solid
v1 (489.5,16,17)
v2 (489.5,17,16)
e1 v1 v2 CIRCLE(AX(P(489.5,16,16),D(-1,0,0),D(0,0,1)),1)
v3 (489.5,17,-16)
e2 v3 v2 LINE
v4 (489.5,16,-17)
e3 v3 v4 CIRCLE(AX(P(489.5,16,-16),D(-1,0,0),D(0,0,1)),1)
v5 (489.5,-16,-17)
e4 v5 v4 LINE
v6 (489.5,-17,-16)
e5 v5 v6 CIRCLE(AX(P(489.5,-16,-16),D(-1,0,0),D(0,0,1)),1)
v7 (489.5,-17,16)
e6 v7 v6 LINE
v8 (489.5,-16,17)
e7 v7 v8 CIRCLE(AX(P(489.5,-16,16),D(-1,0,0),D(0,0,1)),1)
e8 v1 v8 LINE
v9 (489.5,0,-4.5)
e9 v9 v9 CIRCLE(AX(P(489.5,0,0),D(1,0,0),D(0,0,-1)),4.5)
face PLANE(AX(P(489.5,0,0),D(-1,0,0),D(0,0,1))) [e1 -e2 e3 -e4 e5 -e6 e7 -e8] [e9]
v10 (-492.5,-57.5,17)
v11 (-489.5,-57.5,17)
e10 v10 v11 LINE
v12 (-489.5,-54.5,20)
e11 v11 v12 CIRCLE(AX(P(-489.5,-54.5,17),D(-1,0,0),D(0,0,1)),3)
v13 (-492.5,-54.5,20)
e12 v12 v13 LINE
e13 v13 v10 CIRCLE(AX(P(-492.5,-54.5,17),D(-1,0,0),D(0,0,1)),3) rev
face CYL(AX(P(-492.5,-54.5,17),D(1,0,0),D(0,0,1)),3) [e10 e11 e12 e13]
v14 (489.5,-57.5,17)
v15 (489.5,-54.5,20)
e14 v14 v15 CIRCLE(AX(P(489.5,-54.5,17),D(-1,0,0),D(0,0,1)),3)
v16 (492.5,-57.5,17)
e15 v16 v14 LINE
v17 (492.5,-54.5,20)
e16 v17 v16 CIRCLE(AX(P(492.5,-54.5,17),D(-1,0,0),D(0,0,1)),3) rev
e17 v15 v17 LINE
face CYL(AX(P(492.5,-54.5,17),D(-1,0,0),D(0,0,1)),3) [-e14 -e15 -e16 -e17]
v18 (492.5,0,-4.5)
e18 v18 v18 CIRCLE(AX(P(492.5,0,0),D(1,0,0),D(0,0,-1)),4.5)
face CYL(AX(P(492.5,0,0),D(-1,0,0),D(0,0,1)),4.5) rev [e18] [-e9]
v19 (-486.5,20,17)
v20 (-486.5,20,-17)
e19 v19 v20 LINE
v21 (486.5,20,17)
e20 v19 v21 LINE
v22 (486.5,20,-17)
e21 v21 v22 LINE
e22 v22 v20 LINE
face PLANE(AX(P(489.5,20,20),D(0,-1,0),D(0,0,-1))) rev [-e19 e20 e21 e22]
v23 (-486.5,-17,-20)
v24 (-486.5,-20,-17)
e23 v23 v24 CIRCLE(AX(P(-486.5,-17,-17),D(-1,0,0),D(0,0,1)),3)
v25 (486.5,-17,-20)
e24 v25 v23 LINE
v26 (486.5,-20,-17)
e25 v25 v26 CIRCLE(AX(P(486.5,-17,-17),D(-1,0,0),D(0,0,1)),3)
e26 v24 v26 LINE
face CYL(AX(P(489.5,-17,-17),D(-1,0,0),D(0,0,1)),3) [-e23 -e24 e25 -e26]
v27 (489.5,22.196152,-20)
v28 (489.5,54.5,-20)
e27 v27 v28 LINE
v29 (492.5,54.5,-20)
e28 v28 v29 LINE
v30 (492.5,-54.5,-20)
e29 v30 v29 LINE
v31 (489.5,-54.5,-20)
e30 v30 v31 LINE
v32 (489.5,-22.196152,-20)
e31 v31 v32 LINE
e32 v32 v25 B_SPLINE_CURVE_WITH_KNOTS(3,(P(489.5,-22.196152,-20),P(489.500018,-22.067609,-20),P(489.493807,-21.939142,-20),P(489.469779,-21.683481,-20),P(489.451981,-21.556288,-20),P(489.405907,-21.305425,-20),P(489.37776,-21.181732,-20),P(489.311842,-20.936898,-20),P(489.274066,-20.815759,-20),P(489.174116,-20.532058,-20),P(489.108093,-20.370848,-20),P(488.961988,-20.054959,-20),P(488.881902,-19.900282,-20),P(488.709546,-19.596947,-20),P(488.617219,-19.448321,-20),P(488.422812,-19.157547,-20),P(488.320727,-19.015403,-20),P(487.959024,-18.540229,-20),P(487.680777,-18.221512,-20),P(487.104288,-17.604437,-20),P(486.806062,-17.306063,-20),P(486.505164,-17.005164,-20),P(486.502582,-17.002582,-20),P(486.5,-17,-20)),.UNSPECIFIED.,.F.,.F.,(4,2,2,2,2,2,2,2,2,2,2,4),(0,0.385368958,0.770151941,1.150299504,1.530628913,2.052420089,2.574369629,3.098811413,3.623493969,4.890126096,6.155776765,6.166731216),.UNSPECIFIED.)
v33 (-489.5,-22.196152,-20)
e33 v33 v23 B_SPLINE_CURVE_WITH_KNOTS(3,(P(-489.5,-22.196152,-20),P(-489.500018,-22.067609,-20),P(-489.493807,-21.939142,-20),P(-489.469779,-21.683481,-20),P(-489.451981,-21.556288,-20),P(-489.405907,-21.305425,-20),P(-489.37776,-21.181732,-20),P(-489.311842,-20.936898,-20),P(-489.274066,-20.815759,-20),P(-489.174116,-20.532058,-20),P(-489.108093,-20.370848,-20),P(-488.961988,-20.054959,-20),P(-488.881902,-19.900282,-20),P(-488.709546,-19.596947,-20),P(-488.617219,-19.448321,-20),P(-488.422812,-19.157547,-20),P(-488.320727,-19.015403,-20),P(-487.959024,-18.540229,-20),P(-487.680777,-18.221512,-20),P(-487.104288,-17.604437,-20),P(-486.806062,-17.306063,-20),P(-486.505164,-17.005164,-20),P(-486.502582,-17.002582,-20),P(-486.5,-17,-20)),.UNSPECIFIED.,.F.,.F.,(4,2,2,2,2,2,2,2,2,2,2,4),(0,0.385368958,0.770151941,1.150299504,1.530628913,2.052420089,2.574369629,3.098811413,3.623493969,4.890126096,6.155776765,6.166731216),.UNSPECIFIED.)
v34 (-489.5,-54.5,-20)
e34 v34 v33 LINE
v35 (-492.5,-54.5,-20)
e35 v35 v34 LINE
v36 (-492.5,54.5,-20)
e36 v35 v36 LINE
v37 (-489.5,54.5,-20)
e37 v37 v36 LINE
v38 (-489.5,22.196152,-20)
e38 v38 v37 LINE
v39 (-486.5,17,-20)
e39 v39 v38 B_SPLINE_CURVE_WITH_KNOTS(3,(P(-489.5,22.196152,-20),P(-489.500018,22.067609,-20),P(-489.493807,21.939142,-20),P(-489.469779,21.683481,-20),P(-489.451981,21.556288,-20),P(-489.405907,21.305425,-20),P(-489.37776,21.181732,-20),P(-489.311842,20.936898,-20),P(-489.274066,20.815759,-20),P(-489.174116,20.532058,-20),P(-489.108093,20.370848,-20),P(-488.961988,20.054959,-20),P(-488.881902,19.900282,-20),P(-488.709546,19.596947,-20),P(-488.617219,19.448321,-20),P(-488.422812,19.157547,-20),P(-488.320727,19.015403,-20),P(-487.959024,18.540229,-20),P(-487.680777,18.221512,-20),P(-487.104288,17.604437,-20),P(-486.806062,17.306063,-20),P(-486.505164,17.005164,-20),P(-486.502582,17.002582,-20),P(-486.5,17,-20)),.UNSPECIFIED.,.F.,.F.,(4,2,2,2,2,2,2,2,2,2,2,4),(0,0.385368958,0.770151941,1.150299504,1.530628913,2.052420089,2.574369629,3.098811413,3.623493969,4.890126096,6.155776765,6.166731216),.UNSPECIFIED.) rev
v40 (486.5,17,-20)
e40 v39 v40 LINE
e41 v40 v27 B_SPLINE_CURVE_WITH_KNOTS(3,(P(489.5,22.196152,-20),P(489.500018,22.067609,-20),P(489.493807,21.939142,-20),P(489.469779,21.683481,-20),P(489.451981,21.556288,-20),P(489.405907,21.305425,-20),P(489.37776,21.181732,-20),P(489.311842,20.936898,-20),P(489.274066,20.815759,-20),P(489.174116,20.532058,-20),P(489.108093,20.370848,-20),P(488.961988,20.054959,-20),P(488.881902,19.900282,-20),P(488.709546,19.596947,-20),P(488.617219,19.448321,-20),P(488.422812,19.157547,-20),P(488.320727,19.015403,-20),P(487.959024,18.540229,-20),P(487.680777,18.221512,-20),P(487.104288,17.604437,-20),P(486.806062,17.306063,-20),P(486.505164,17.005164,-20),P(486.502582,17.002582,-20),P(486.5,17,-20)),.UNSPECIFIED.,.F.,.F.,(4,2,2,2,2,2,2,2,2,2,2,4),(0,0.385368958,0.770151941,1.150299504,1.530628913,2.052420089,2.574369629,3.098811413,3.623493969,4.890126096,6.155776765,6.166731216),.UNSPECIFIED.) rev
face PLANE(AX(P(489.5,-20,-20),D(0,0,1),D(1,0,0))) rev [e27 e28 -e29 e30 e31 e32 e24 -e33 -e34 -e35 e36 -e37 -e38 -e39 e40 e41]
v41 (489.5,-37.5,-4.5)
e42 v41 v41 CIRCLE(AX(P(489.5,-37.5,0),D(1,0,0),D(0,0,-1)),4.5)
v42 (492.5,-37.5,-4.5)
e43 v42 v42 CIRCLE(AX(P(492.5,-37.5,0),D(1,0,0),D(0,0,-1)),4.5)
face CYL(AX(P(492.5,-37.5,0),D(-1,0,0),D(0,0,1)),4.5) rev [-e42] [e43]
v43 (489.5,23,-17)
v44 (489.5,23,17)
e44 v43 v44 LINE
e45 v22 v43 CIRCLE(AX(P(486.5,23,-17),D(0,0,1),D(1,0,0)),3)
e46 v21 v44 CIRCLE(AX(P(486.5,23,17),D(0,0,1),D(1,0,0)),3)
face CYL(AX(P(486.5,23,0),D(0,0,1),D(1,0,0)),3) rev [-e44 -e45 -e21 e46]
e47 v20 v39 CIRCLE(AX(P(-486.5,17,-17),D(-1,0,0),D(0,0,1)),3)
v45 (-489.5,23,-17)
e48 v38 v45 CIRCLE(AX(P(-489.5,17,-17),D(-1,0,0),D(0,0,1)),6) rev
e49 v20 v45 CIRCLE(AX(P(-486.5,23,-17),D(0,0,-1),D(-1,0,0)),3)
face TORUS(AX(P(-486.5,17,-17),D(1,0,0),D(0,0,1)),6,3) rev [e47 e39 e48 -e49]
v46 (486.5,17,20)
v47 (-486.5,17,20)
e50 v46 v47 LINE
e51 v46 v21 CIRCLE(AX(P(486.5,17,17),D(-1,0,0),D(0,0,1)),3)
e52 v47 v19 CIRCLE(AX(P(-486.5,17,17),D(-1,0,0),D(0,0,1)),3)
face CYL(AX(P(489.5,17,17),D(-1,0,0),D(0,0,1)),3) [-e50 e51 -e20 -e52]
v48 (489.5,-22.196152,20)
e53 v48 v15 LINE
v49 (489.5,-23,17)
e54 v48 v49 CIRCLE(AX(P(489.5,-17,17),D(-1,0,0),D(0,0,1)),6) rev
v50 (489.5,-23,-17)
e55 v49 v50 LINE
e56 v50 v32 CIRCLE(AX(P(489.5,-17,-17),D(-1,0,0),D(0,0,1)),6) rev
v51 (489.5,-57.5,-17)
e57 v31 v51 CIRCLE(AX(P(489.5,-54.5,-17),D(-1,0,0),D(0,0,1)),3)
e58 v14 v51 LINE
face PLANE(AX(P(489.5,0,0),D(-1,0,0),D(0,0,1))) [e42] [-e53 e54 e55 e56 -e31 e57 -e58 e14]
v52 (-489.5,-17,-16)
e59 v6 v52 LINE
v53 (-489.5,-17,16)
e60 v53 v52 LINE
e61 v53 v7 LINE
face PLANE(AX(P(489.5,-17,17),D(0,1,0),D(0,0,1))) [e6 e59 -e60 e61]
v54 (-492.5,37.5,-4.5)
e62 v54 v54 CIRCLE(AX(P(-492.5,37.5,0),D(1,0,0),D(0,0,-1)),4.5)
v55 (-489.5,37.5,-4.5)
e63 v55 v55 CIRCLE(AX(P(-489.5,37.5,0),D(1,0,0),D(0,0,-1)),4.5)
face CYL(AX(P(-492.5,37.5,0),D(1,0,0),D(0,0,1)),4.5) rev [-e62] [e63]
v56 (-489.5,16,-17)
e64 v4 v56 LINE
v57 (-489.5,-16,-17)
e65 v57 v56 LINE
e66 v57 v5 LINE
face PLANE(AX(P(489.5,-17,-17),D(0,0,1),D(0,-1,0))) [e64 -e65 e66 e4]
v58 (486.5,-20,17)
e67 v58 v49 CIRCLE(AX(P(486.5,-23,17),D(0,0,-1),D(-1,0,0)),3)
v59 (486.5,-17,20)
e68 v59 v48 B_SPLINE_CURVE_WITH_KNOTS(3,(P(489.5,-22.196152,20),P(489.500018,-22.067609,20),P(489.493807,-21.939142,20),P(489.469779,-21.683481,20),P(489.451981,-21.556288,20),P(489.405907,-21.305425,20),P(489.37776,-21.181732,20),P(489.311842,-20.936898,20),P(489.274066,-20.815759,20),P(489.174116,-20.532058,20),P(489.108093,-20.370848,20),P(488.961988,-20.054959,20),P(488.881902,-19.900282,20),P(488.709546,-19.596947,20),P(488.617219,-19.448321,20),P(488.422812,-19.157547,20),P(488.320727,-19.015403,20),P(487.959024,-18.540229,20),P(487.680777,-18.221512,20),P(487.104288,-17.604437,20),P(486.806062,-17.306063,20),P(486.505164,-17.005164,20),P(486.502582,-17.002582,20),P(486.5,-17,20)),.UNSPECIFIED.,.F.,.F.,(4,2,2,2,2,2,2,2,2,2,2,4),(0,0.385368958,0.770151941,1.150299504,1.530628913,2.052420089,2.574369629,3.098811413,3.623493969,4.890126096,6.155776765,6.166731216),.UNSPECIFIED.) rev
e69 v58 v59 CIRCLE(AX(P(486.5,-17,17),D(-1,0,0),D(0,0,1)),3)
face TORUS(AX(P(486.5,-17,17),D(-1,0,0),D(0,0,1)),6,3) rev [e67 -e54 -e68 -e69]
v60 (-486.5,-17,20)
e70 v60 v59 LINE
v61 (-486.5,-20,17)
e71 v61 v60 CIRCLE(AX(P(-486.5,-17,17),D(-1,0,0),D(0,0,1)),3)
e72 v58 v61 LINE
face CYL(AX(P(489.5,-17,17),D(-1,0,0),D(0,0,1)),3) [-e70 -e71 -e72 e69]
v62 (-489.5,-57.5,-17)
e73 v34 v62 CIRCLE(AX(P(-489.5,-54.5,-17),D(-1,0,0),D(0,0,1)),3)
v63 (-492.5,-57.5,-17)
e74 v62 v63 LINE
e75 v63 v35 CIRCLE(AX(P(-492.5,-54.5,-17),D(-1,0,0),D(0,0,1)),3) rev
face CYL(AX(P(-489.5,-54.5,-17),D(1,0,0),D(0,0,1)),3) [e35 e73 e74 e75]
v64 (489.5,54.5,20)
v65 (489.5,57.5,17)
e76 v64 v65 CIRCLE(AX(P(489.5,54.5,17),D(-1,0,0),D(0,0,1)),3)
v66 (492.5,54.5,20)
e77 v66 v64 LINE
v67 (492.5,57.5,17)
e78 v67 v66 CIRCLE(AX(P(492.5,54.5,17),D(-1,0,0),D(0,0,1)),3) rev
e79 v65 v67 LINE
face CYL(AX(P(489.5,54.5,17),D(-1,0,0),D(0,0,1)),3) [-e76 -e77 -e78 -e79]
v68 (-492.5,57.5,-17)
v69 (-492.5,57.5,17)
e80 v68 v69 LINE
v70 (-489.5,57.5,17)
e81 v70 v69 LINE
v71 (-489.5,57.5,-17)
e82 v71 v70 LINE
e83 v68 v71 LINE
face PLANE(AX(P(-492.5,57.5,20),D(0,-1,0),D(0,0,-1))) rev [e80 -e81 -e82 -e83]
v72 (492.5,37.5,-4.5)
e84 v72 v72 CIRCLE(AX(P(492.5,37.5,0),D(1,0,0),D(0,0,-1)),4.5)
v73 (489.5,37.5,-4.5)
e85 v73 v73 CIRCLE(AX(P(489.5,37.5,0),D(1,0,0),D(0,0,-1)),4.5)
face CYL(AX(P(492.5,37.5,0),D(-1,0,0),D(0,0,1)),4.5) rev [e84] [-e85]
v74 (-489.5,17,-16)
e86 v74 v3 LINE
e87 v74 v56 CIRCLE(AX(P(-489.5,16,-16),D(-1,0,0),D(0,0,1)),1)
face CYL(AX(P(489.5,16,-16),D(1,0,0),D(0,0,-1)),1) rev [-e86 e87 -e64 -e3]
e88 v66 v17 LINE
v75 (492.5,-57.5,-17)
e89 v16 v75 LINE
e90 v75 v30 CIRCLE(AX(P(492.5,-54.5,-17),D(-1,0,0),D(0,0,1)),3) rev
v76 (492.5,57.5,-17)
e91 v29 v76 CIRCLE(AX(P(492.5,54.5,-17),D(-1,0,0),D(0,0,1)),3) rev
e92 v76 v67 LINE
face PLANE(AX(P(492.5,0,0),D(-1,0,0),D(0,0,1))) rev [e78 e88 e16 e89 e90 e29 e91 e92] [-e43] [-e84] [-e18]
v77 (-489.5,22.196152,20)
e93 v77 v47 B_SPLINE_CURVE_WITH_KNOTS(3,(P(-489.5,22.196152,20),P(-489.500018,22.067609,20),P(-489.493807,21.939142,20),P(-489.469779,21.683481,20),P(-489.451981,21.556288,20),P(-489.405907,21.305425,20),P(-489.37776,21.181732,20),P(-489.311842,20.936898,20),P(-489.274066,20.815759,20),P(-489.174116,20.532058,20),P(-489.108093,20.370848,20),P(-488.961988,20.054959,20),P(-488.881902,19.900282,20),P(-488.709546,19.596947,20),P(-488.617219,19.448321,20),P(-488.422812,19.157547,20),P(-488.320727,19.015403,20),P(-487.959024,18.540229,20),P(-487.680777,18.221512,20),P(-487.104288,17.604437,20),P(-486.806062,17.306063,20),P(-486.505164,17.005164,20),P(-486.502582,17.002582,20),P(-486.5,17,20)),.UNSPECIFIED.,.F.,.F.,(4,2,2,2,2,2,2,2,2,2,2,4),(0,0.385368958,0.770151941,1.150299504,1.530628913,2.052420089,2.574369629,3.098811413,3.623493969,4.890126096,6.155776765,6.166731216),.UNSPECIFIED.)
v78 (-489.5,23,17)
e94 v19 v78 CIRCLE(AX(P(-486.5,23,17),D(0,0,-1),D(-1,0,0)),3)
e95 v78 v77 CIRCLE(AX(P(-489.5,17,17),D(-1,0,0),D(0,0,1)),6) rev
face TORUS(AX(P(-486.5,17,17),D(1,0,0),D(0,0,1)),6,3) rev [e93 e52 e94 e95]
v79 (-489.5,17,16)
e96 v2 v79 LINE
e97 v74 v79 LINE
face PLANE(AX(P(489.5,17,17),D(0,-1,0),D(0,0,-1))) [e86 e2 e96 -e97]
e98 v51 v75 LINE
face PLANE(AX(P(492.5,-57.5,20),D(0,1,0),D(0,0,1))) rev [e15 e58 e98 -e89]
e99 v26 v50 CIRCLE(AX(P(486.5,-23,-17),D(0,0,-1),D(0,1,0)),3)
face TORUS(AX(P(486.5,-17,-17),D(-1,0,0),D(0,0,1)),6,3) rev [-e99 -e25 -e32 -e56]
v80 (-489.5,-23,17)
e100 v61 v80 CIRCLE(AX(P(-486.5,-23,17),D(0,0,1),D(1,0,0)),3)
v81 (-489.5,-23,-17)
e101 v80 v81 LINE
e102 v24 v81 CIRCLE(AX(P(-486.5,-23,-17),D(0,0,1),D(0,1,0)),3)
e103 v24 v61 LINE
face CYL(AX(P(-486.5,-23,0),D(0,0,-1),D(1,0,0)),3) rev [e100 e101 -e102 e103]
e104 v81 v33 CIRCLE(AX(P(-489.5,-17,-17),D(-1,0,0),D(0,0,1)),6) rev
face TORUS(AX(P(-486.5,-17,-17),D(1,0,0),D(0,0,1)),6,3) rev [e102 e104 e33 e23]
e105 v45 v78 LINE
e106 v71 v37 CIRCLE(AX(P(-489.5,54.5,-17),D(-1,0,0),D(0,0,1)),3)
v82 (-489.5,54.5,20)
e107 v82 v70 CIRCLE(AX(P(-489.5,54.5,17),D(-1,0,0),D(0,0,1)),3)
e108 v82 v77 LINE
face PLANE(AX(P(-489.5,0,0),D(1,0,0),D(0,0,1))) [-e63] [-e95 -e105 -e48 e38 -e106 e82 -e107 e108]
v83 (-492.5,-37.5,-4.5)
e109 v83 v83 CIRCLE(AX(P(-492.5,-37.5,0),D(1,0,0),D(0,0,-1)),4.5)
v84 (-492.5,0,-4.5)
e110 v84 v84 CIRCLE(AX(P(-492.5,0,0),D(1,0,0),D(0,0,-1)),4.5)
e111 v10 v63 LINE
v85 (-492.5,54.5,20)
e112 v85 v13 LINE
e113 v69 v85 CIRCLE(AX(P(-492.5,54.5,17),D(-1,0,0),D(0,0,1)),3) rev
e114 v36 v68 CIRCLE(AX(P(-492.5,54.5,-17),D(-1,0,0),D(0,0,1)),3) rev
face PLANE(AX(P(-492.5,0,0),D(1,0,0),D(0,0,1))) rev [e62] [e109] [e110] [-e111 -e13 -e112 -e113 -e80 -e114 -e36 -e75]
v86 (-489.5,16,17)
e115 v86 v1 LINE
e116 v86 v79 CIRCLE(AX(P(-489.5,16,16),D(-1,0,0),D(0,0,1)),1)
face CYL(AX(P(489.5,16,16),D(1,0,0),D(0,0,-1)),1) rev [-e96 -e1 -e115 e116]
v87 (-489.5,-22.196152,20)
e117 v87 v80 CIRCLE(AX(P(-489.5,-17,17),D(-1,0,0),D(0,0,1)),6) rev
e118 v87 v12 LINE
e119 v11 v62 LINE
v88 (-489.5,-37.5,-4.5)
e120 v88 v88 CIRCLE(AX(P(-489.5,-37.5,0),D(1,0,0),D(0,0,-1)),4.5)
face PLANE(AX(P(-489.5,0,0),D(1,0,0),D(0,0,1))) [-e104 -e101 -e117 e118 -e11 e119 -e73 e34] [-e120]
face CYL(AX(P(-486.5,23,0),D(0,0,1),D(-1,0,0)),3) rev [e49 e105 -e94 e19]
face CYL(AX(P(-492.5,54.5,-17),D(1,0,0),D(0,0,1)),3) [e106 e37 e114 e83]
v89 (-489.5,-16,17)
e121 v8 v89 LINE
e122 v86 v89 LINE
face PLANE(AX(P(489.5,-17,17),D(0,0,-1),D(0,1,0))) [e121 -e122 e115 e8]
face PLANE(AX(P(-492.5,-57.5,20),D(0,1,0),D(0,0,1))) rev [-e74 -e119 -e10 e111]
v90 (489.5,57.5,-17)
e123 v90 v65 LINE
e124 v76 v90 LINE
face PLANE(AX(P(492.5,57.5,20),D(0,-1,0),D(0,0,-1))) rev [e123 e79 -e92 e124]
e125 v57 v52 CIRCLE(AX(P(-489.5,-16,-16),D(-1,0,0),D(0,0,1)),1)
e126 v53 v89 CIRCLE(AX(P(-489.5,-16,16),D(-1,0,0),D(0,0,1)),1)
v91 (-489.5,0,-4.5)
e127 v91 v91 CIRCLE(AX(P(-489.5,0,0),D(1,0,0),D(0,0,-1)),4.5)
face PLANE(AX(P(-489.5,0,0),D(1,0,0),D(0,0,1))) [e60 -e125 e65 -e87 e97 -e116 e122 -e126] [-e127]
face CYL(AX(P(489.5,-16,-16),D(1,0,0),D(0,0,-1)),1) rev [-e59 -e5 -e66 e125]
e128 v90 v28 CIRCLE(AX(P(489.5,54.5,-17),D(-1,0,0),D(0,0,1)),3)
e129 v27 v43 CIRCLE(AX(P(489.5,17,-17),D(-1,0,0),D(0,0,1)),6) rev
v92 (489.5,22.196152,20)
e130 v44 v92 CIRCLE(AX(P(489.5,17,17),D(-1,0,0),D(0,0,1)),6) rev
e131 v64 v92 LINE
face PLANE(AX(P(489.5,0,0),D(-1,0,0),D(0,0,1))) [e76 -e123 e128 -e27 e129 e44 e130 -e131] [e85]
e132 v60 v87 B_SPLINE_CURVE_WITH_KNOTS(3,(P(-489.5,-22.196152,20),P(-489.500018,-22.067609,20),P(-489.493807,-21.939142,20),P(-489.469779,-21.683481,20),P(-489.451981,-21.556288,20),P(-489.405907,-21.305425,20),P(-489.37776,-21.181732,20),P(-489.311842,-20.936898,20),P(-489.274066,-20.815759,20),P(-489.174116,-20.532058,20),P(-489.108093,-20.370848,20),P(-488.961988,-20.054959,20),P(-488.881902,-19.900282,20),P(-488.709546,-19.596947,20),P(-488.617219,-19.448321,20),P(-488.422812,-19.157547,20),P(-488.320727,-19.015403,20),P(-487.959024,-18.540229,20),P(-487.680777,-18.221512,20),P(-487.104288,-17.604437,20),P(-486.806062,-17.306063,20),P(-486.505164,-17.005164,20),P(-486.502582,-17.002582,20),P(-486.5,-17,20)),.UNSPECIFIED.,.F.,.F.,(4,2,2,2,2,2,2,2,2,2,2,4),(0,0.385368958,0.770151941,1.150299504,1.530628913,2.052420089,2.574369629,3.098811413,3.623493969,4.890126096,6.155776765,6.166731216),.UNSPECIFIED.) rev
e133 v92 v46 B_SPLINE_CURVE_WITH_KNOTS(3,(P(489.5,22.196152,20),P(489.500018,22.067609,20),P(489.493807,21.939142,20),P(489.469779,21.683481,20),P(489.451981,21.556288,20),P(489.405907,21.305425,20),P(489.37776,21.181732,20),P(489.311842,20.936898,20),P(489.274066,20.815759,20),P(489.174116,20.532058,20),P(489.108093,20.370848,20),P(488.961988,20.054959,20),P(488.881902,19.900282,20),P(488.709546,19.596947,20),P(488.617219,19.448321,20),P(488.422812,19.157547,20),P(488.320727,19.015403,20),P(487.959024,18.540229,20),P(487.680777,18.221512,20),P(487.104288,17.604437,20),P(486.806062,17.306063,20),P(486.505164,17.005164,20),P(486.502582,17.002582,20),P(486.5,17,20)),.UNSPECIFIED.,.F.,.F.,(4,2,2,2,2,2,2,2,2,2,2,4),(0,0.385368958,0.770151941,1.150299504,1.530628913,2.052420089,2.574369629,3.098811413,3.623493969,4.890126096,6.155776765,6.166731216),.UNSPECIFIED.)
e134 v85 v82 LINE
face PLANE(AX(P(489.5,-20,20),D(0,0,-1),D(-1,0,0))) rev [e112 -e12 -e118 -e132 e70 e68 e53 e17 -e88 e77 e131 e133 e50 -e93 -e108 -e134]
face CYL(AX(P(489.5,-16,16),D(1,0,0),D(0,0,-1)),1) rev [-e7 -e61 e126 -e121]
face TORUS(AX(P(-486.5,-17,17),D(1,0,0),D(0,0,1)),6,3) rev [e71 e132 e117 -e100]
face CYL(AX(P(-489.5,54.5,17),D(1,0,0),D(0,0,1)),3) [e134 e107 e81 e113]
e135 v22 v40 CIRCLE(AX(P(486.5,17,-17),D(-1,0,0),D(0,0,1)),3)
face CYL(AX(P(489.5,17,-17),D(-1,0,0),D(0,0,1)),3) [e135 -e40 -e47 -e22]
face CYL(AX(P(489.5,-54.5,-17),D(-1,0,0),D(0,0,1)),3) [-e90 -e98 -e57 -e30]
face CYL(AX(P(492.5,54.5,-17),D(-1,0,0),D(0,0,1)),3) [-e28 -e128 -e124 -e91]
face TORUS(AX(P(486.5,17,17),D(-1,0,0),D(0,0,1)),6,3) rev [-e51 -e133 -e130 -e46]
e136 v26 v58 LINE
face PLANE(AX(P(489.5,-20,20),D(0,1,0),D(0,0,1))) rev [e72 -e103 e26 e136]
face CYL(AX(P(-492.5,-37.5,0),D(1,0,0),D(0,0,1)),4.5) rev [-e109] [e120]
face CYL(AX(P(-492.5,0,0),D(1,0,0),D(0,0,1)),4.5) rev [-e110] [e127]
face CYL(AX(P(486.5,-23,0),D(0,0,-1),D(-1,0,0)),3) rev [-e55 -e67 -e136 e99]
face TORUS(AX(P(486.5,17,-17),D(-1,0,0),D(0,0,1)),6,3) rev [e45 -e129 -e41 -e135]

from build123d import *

# Parameters (mm, degrees)
SKETCH1_W           = 40
SKETCH1_H           = 40
SKETCH1_W_2         = 34
SKETCH1_H_2         = 34
BOSS_EXTRUDE1_DEPTH = 489.5
FILLET1_R           = 1
FILLET2_R           = 3
SKETCH2_W           = 40
SKETCH2_H           = 115
SKETCH2_R           = 4.5
BOSS_EXTRUDE2_DEPTH = 3
FILLET3_R           = 3
FILLET4_R           = 3


with BuildPart() as part:
    # Sketch1 → Boss-Extrude1 (new body)
    with BuildSketch(Plane(origin=(0, 0, 0), x_dir=(0, 0, -1), z_dir=(1, 0, 0))):
        Rectangle(SKETCH1_W, SKETCH1_H)
        Rectangle(SKETCH1_W_2, SKETCH1_H_2, mode=Mode.SUBTRACT)
    extrude(amount=BOSS_EXTRUDE1_DEPTH)

    # Fillet1
    fillet1_edges = [part.edges().sort_by_distance(p)[0] for p in [
        (244.75, -17, -17),
        (244.75, 17, -17),
        (244.75, 17, 17),
        (244.75, -17, 17),
    ]]
    fillet(fillet1_edges, radius=FILLET1_R)

    # Fillet2
    fillet2_edges = [part.edges().sort_by_distance(p)[0] for p in [
        (244.75, -20, -20),
        (244.75, -20, 20),
        (244.75, 20, 20),
        (244.75, 20, -20),
    ]]
    fillet(fillet2_edges, radius=FILLET2_R)

    # Sketch2 → Boss-Extrude2 (add)
    with BuildSketch(Plane(origin=(489.5, 0, 0), x_dir=(0, 0, -1), z_dir=(1, 0, 0))):
        Rectangle(SKETCH2_W, SKETCH2_H)
        Circle(SKETCH2_R, mode=Mode.SUBTRACT)
        with Locations((0, -37.5)):
            Circle(SKETCH2_R, mode=Mode.SUBTRACT)
        with Locations((0, 37.5)):
            Circle(SKETCH2_R, mode=Mode.SUBTRACT)
    extrude(amount=BOSS_EXTRUDE2_DEPTH)

    # Fillet3
    # the kernel refuses this fillet: 3 mm, written as the material it adds along each edge
    with BuildSketch(Plane(origin=(489.5, -20, 17), x_dir=(0, -1, 0), z_dir=(0, 0, -1)), Plane(origin=(489.5, 20, -17), x_dir=(0, 1, 0), z_dir=(0, 0, 1))) as fillet3_piece_1:
        with BuildLine():
            CenterArc((FILLET3_R, FILLET3_R), FILLET3_R, 180, 90)
            Line((0, FILLET3_R), (0, 0))
            Line((0, 0), (FILLET3_R, 0))
        make_face()
    extrude(amount=34)
    with BuildSketch(Plane(origin=(489.5, 17, 17), x_dir=(0, 1, 0), z_dir=(0, 0, -1))) as fillet3_piece_2_section:
        with BuildLine():
            CenterArc((3 + FILLET3_R, -FILLET3_R), FILLET3_R, 90, 90)
            Line((3, -FILLET3_R), (3, 0))
            Line((3, 0), (3 + FILLET3_R, 0))
        make_face()
    fillet3_piece_2 = revolve(axis=Axis((489.5, 17, 17), (1, 0, 0)), revolution_arc=233.296989237, mode=Mode.PRIVATE)
    fillet3_piece_2 = split(fillet3_piece_2, bisect_by=Plane(origin=(488.998099396, 20.659325751, 20), z_dir=(0, 0, -1)), keep=Keep.TOP, mode=Mode.PRIVATE)
    fillet3_piece_2 = split(fillet3_piece_2, bisect_by=Plane(origin=(488.998099396, 20.659325751, 17), z_dir=(0, 0, 1)), keep=Keep.TOP, mode=Mode.PRIVATE)
    add(fillet3_piece_2)
    with BuildSketch(Plane(origin=(489.5, 17, -17), x_dir=(0, -0.5976672776328276, 0.8017442392976482), z_dir=(0, 0.8017442392976482, 0.5976672776328276))) as fillet3_piece_3_section:
        with BuildLine():
            CenterArc((3 + FILLET3_R, -FILLET3_R), FILLET3_R, 90, 90)
            Line((3, -FILLET3_R), (3, 0))
            Line((3, 0), (3 + FILLET3_R, 0))
        make_face()
    fillet3_piece_3 = revolve(axis=Axis((489.5, 17, -17), (1, 0, 0)), revolution_arc=233.296989237, mode=Mode.PRIVATE)
    fillet3_piece_3 = split(fillet3_piece_3, bisect_by=Plane(origin=(488.565115083, 19.249816872, -20), z_dir=(0, 0, 1)), keep=Keep.TOP, mode=Mode.PRIVATE)
    fillet3_piece_3 = split(fillet3_piece_3, bisect_by=Plane(origin=(488.565115083, 19.249816872, -17), z_dir=(0, 0, -1)), keep=Keep.TOP, mode=Mode.PRIVATE)
    add(fillet3_piece_3)
    with BuildSketch(Plane(origin=(489.5, -17, -17), x_dir=(0, -1, 0), z_dir=(0, 0, 1))) as fillet3_piece_4_section:
        with BuildLine():
            CenterArc((3 + FILLET3_R, -FILLET3_R), FILLET3_R, 90, 90)
            Line((3, -FILLET3_R), (3, 0))
            Line((3, 0), (3 + FILLET3_R, 0))
        make_face()
    fillet3_piece_4 = revolve(axis=Axis((489.5, -17, -17), (1, 0, 0)), revolution_arc=233.296989237, mode=Mode.PRIVATE)
    fillet3_piece_4 = split(fillet3_piece_4, bisect_by=Plane(origin=(488.998099396, -20.659325751, -20), z_dir=(0, 0, 1)), keep=Keep.TOP, mode=Mode.PRIVATE)
    fillet3_piece_4 = split(fillet3_piece_4, bisect_by=Plane(origin=(488.998099396, -20.659325751, -17), z_dir=(0, 0, -1)), keep=Keep.TOP, mode=Mode.PRIVATE)
    add(fillet3_piece_4)
    with BuildSketch(Plane(origin=(489.5, -17, 17), x_dir=(0, -1, 0), z_dir=(0, 0, -1))) as fillet3_piece_5_section:
        with BuildLine():
            CenterArc((3 + FILLET3_R, FILLET3_R), FILLET3_R, 180, 90)
            Line((3, FILLET3_R), (3, 0))
            Line((3, 0), (3 + FILLET3_R, 0))
        make_face()
    fillet3_piece_5 = revolve(axis=Axis((489.5, -17, 17), (-1, 0, 0)), revolution_arc=233.296989237, mode=Mode.PRIVATE)
    fillet3_piece_5 = split(fillet3_piece_5, bisect_by=Plane(origin=(488.998099366, -20.659325736, 20), z_dir=(0, 0, -1)), keep=Keep.TOP, mode=Mode.PRIVATE)
    fillet3_piece_5 = split(fillet3_piece_5, bisect_by=Plane(origin=(488.998099366, -20.659325736, 17), z_dir=(0, 0, 1)), keep=Keep.TOP, mode=Mode.PRIVATE)
    add(fillet3_piece_5)

    # Fillet4
    fillet4_edges = [part.edges().sort_by_distance(p)[0] for p in [
        (491, -57.5, -20),
        (491, 57.5, -20),
        (491, 57.5, 20),
        (491, -57.5, 20),
    ]]
    fillet(fillet4_edges, radius=FILLET4_R)

    # Mirror1: part across plane


with BuildPart() as part_1:
    add(part.part)
    add(part.part.mirror(Plane(origin=(0, 0, 0), x_dir=(0, 0, 1), z_dir=(1, 0, 0))))


solid = part_1.part
